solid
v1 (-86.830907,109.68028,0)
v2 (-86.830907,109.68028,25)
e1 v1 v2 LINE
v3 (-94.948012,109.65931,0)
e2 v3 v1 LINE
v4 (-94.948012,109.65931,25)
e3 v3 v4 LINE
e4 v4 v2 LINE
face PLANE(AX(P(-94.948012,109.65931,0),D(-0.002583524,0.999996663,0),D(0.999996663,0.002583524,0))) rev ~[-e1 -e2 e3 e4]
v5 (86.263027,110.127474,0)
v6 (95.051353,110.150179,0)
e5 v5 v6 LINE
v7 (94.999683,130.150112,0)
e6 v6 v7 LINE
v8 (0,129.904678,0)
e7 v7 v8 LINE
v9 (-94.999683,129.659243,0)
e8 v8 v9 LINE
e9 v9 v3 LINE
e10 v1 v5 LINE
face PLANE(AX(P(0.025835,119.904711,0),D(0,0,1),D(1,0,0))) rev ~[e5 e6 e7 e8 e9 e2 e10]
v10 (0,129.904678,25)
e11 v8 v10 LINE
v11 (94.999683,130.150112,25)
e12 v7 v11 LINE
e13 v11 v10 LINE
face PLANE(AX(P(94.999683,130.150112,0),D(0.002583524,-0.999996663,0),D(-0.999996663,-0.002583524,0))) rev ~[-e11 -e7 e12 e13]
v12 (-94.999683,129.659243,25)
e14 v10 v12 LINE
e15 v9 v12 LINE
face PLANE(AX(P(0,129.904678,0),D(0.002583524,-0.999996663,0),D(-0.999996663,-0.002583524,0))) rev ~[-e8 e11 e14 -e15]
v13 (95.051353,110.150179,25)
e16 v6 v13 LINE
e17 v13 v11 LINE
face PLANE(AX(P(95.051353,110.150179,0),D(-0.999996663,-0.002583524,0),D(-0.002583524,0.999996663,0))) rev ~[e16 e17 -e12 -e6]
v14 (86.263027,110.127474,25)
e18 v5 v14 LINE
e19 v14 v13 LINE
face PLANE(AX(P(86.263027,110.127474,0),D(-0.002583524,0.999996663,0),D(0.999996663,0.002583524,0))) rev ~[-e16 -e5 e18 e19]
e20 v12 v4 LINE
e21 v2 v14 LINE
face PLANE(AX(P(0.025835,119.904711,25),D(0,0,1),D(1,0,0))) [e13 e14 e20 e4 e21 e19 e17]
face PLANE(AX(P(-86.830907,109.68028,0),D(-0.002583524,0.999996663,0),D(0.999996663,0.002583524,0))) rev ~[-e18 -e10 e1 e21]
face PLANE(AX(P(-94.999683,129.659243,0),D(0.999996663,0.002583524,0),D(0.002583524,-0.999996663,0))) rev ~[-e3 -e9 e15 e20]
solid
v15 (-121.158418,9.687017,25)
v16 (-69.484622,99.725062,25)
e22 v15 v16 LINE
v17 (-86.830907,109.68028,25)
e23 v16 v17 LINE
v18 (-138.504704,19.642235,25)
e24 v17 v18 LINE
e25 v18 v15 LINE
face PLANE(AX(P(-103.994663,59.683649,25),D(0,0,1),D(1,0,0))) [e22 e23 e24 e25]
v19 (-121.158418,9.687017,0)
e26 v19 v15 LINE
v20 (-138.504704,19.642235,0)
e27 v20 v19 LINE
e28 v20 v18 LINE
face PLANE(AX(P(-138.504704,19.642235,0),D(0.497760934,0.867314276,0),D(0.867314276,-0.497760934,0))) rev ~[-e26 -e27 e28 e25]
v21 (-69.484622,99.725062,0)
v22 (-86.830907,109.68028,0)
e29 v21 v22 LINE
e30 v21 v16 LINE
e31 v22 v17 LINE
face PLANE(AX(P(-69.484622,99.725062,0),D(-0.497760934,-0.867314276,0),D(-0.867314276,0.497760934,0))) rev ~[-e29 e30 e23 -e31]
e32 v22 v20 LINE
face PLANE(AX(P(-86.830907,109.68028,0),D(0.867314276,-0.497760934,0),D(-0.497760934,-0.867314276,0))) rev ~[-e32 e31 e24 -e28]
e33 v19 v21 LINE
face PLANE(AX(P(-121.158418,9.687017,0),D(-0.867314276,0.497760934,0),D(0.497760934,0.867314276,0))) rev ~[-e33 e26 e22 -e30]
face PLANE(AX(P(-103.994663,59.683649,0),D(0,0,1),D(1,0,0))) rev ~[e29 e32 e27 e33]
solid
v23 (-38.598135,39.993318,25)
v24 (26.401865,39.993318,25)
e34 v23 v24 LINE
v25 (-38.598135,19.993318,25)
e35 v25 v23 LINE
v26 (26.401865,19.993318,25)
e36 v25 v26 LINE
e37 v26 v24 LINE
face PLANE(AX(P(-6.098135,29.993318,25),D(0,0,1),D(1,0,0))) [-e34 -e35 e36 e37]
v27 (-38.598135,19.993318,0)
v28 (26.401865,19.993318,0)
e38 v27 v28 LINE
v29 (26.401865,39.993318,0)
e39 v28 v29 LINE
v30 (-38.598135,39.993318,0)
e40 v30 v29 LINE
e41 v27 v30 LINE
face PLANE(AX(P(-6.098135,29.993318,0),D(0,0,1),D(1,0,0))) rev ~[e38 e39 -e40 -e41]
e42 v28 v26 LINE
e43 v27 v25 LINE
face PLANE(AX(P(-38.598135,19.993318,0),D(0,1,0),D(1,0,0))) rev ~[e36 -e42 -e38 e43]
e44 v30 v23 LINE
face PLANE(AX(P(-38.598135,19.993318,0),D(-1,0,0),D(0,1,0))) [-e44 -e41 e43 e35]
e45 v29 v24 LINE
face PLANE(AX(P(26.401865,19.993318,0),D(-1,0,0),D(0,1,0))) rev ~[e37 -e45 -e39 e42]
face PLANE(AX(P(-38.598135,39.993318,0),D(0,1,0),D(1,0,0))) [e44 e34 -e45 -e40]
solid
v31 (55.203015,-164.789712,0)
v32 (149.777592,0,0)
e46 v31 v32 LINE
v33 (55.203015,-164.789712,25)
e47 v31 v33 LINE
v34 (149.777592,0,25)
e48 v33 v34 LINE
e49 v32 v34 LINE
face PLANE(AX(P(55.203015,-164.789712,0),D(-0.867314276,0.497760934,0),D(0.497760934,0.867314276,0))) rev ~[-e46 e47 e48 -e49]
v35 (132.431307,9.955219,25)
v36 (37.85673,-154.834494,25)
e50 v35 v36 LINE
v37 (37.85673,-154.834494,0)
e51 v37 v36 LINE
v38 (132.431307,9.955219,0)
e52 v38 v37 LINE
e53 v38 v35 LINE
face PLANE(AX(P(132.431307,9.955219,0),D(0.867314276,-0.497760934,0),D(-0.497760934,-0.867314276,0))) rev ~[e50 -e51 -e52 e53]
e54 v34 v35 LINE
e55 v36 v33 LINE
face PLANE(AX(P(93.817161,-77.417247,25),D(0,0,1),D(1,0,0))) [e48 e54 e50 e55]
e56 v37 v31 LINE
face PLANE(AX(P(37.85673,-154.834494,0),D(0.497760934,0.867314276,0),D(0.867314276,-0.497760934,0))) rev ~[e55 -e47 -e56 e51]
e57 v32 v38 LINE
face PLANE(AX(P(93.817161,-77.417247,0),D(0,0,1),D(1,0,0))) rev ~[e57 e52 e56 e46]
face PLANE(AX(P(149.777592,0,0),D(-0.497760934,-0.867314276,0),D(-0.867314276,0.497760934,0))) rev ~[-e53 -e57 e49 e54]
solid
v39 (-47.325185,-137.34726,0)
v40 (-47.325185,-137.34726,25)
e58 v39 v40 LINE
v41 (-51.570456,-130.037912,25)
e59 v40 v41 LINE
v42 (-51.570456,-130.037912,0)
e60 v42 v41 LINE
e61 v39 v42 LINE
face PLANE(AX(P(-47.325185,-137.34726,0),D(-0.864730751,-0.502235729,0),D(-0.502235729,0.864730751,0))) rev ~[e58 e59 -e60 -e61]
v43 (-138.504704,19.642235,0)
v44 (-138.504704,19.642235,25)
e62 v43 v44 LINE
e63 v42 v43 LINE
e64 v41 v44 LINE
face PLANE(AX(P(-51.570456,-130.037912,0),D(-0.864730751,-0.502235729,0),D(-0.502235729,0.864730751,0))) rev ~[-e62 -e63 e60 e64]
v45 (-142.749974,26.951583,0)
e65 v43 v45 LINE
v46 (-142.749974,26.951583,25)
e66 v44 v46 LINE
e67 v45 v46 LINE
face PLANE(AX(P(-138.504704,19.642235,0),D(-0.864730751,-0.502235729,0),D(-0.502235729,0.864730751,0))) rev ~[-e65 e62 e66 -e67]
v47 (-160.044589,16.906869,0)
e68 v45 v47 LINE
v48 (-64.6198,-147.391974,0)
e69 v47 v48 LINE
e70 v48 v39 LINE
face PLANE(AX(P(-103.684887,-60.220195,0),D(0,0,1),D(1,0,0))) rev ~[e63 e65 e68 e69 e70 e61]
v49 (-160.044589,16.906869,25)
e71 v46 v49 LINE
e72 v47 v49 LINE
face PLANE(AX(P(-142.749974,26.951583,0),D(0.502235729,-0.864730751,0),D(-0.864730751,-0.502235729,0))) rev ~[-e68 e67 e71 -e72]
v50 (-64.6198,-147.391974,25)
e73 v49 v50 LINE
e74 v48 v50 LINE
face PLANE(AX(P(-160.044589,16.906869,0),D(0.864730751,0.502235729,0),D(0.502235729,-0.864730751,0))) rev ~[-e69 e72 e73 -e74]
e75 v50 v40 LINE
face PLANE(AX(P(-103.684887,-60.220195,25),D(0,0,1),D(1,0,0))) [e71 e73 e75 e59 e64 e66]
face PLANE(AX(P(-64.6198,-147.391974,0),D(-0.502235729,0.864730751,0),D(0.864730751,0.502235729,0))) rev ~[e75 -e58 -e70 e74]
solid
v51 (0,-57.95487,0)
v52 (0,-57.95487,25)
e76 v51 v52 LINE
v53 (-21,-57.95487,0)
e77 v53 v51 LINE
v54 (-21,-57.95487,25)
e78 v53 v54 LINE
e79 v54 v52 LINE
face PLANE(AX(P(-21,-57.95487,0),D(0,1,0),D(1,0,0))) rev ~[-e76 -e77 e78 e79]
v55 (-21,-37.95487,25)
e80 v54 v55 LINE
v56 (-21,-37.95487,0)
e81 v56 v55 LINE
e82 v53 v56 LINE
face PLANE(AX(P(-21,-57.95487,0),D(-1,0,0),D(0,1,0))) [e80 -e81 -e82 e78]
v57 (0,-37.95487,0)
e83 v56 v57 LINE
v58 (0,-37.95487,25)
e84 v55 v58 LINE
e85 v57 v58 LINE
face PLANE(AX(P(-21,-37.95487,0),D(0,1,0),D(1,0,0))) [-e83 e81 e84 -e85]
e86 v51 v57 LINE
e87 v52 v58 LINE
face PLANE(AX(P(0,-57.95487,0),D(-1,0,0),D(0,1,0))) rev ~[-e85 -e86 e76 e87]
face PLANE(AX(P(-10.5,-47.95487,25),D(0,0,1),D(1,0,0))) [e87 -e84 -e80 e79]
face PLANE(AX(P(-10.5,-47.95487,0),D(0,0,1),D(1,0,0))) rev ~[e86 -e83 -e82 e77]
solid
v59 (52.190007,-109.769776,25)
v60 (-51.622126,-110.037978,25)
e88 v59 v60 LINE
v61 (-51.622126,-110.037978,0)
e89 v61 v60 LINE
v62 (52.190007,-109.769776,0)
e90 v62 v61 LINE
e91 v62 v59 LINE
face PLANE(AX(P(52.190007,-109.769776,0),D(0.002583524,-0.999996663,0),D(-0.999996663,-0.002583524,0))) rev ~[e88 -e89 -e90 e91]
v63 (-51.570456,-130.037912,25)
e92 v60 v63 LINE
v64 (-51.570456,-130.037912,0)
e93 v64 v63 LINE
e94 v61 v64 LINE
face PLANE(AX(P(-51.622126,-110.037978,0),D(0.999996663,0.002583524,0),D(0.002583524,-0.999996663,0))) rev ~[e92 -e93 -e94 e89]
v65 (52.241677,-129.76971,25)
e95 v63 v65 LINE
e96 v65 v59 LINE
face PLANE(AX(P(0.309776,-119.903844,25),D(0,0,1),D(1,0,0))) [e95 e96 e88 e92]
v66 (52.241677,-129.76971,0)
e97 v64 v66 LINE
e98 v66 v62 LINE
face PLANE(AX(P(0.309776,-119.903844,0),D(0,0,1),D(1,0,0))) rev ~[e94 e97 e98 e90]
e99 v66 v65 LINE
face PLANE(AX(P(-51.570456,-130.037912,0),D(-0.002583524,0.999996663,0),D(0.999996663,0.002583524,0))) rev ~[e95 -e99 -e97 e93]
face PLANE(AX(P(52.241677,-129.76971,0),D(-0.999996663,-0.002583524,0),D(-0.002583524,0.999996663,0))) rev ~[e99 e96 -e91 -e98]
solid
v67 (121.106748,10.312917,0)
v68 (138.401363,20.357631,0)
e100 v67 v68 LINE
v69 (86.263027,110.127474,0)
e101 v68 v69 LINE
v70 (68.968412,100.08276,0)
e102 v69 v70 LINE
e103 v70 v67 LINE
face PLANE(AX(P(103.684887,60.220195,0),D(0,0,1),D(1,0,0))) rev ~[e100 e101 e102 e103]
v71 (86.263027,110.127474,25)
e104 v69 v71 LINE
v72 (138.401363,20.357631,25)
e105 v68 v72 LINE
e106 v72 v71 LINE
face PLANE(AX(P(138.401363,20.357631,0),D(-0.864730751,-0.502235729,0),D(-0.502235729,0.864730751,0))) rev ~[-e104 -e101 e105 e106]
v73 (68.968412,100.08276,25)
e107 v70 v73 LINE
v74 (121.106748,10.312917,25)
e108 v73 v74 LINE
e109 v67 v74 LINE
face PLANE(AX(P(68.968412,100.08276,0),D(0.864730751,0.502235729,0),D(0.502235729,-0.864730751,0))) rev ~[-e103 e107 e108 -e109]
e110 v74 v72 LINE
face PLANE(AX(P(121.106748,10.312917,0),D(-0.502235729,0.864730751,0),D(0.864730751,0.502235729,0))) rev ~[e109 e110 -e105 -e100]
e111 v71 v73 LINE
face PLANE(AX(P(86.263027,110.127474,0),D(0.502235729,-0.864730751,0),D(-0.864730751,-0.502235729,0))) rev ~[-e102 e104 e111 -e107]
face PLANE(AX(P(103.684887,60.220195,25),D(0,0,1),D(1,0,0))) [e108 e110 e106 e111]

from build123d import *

# Parameters (mm, degrees)
F1_DEPTH = 25
F2_DEPTH = 25
F0_W     = 65
F0_H     = 20
F3_DEPTH = 25
F0_W_2   = 21


# Not quite as in the source:
# - a feature names something its author has since deleted; it is built from what else it names


with BuildPart() as f1:
    # F0 (on Top) → F1 (new body)
    with BuildSketch(Plane.XY):
        Polygon((-69.4846216079, 99.7250617094), (-86.8309071217, 109.6802803847), (-138.504703636, 19.6422352991), (-121.1584181221, 9.6870166238), align=None)
    extrude(amount=F1_DEPTH)


with BuildPart() as f1b:
    # F0 (on Top) → F1, piece 2 (new body)
    with BuildSketch(Plane.XY):
        Polygon((94.9996829561, 130.1501124276), (0, 129.9046776291), (-94.9996829561, 129.6592428305), (-94.9480124722, 109.6593095766), (-86.8309071217, 109.6802803847), (-63.7681405371, 109.739863799), (86.2630265741, 110.1274742428), (95.05135344, 110.1501791737), align=None)
    extrude(amount=F1_DEPTH)


with BuildPart() as f1c:
    # F0 (on Top) → F1, piece 3 (new body)
    with BuildSketch(Plane.XY):
        Polygon((138.4013626682, 20.3576312087), (86.2630265741, 110.1274742428), (68.9684115442, 100.0827596642), (121.1067476382, 10.3129166301), align=None)
    extrude(amount=F1_DEPTH)


with BuildPart() as f1d:
    # F0 (on Top) → F1, piece 4 (new body)
    with BuildSketch(Plane.XY):
        Polygon((-51.6221260304, -110.0379783395), (-51.5704555465, -130.0379115934), (52.2416770618, -129.769709542), (52.1900065779, -109.769776288), align=None)
    extrude(amount=F1_DEPTH)


with BuildPart() as f1e:
    # F0 (on Top) → F1, piece 5 (new body)
    with BuildSketch(Plane.XY):
        Polygon((-51.5704555465, -130.0379115934), (-138.504703636, 19.6422352991), (-142.7499738398, 26.951583245), (-160.0445888697, 16.9068686664), (-112.3321946212, -65.2425527258), (-64.6198003726, -147.391974118), (-47.3251853427, -137.3472595393), align=None)
    extrude(amount=F1_DEPTH)


with BuildPart() as f2:
    # F0 (on Top) → F2 (new body)
    with BuildSketch(Plane.XY):
        Polygon((132.4313069212, 9.9552186753), (52.2416770618, -129.769709542), (37.8567295061, -154.8344937062), (55.2030150199, -164.7897123814), (102.4903037275, -82.3948561907), (149.7775924351, 0), align=None)
    extrude(amount=F2_DEPTH)


with BuildPart() as f3:
    # F0 (on Top) → F3 (new body)
    with BuildSketch(Plane.XY):
        with Locations((-6.0981351137, 29.9933182448)):
            Rectangle(F0_W, F0_H)
    extrude(amount=F3_DEPTH)


with BuildPart() as f3b:
    # F0 (on Top) → F3, piece 2 (new body)
    with BuildSketch(Plane.XY):
        with Locations((-10.5, -47.9548701644)):
            Rectangle(F0_W_2, F0_H)
    extrude(amount=F3_DEPTH)


solid = Compound([f1.part, f1b.part, f1c.part, f1d.part, f1e.part, f2.part, f3.part, f3b.part])
